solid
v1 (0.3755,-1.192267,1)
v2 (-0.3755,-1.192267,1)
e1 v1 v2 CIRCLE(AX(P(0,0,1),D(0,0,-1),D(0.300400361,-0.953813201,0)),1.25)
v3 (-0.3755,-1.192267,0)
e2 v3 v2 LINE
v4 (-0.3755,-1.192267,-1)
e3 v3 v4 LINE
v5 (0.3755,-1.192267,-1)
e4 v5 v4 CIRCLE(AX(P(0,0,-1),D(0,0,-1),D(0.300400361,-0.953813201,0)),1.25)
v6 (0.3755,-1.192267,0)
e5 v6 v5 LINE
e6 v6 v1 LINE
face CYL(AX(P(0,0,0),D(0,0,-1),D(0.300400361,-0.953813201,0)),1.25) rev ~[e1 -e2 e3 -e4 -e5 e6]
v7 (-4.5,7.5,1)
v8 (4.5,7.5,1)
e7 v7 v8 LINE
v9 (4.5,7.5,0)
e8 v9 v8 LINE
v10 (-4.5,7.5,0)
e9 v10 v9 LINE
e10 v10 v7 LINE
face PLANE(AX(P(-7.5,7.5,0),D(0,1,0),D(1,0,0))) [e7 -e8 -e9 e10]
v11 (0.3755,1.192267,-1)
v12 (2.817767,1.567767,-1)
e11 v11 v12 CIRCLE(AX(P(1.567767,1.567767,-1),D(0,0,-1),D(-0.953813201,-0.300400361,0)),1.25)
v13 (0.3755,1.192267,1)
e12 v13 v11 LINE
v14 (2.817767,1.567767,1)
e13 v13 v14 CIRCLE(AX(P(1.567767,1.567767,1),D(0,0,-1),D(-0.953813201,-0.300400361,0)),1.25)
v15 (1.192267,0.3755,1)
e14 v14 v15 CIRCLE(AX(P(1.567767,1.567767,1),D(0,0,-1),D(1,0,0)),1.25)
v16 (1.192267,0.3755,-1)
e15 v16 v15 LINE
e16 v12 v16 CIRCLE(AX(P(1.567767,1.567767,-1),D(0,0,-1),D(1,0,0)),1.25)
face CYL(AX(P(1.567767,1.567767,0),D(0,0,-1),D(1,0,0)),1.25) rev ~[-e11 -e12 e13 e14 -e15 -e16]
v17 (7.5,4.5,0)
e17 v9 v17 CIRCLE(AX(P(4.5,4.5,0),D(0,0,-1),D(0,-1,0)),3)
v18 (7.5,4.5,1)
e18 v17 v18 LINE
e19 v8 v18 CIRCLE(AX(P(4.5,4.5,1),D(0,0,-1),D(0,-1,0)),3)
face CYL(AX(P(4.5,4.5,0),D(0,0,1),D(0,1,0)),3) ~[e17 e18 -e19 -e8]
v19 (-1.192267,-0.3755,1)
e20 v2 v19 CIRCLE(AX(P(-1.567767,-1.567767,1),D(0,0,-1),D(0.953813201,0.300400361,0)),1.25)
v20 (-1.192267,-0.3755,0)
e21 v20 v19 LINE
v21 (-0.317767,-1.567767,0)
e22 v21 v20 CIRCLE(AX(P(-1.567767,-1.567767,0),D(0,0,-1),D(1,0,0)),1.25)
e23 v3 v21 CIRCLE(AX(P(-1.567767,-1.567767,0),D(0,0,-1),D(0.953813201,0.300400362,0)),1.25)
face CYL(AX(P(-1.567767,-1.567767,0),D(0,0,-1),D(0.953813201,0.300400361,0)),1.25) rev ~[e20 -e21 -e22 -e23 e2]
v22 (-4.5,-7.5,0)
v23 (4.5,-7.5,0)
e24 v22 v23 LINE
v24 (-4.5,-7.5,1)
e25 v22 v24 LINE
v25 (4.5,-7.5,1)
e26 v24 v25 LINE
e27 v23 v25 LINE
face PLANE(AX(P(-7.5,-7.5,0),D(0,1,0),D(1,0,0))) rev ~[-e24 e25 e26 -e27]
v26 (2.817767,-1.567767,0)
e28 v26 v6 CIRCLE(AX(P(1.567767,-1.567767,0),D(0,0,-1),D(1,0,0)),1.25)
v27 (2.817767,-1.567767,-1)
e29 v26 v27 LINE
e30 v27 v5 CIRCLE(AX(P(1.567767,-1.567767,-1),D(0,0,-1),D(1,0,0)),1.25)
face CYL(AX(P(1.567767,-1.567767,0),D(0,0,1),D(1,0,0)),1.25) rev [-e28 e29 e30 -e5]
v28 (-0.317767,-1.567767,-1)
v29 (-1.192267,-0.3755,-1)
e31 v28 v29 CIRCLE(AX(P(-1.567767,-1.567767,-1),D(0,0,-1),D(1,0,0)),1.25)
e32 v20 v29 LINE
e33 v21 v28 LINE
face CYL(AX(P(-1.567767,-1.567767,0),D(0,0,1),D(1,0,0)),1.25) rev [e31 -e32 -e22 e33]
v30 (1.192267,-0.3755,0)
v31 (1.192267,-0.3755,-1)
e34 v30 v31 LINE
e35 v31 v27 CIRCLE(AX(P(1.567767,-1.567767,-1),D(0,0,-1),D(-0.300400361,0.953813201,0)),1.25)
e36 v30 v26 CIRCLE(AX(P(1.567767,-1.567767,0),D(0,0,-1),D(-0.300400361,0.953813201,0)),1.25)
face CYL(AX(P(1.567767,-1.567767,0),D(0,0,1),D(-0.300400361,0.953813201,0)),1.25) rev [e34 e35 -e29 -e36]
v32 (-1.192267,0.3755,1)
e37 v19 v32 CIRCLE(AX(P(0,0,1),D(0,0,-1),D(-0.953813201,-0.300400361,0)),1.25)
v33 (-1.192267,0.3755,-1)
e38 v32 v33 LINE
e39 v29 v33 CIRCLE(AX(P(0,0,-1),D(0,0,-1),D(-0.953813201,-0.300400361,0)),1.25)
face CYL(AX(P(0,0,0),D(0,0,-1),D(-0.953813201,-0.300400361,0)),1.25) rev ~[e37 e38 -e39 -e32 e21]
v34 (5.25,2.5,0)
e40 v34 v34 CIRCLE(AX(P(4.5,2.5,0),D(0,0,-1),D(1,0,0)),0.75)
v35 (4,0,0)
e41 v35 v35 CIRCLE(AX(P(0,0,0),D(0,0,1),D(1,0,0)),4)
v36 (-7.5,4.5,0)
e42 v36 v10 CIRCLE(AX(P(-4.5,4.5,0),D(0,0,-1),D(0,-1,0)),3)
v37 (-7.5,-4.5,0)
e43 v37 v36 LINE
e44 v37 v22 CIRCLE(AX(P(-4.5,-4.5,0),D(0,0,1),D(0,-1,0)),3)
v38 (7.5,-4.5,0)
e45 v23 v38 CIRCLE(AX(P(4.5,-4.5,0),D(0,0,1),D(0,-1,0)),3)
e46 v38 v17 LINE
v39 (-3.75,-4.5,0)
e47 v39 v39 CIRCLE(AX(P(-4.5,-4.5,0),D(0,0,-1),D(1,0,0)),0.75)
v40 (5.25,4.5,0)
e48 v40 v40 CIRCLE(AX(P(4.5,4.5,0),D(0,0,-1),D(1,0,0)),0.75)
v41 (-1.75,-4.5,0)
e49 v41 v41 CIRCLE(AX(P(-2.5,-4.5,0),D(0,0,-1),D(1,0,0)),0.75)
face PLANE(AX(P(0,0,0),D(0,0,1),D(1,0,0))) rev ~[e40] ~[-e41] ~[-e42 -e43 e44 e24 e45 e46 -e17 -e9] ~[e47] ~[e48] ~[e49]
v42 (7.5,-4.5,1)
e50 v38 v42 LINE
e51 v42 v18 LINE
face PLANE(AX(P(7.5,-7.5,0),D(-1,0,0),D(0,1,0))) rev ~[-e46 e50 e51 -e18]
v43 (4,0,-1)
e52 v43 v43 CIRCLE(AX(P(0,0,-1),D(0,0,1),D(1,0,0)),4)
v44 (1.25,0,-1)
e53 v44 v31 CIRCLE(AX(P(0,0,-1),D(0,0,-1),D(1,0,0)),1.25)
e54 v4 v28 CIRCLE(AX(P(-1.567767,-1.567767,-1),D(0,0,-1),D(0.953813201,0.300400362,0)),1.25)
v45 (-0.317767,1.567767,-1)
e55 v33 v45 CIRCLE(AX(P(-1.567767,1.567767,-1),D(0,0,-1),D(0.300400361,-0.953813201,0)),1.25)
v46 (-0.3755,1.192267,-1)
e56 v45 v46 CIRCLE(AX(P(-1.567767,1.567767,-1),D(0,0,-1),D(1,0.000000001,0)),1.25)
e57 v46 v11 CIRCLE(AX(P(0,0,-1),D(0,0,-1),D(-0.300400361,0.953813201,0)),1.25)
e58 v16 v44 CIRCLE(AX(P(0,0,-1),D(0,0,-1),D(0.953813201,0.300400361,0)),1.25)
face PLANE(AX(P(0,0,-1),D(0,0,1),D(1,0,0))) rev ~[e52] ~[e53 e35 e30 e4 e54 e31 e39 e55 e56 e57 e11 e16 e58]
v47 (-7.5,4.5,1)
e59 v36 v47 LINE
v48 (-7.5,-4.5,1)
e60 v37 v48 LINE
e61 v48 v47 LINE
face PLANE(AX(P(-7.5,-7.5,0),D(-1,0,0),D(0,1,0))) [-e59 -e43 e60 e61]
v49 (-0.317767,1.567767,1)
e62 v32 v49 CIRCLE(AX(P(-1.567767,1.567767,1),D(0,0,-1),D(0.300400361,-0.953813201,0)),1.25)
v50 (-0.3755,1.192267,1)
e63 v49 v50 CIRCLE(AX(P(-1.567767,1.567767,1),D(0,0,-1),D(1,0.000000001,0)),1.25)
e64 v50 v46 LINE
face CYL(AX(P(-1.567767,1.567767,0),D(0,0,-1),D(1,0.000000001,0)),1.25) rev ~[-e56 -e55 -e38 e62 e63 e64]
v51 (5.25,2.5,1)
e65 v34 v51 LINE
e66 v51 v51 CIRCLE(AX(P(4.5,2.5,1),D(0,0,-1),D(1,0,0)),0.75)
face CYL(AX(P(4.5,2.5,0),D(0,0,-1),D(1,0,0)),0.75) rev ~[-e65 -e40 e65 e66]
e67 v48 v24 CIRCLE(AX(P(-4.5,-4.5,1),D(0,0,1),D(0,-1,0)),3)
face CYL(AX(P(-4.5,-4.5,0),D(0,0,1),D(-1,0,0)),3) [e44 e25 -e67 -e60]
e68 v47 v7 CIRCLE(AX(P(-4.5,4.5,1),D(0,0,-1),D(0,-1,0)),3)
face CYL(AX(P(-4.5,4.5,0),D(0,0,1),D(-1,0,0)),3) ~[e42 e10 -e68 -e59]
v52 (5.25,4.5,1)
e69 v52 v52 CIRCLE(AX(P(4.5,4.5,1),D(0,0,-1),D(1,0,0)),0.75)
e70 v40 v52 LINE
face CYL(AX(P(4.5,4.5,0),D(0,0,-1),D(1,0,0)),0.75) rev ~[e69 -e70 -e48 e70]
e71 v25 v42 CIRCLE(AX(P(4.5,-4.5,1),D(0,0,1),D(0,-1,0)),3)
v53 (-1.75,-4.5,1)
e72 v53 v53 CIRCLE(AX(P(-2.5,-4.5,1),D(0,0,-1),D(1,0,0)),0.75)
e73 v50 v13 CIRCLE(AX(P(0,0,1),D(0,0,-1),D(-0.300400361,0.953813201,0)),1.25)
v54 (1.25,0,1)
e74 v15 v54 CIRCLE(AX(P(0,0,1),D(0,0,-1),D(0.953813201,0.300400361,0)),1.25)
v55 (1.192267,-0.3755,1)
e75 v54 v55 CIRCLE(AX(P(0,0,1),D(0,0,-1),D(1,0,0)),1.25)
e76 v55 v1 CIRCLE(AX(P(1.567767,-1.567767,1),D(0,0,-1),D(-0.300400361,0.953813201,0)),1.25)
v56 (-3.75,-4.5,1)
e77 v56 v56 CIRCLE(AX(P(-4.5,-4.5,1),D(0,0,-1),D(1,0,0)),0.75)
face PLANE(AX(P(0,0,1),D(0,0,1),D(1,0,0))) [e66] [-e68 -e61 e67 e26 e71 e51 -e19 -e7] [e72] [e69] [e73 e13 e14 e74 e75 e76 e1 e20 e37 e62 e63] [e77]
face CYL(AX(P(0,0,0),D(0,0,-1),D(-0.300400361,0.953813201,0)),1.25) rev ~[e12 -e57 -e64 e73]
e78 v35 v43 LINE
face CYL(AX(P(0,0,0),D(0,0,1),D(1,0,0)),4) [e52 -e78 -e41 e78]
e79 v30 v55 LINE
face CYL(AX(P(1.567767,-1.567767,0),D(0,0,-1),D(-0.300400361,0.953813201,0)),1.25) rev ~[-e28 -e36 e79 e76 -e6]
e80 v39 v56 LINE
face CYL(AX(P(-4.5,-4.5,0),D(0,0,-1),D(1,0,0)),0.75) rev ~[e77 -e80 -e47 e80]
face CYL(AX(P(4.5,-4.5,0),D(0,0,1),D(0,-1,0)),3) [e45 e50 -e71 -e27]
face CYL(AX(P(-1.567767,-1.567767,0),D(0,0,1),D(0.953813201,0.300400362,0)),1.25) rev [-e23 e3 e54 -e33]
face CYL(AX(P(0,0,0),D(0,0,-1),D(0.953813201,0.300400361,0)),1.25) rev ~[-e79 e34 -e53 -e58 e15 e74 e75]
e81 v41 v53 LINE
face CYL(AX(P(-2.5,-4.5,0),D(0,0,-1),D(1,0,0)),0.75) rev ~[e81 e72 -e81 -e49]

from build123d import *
from build123d import SkipClean  # not in build123d's __all__

# Parameters (mm, degrees)
F0_R     = 4
F1_DEPTH = 1
F2_W     = 15
F2_H     = 15
F2_R     = 5
F2_R_2   = 4
F3_DEPTH = 1
F4_R     = 3
F5_R     = 0.75
F6_DEPTH = 25


# Not quite as in the source:
# - after a boolean that leaves OpenCascade's solid faulty, fix() repairs it


with BuildPart() as f1:
    # F0 (on Top) → F1 (new body)
    with BuildSketch(Plane.XY):
        Circle(F0_R)
        with BuildLine():
            ThreePointArc((1.1922665017, 0.3755004513), (1.2354823202, 0.1899564067), (1.25, 0))
            ThreePointArc((1.25, 0), (1.2354823202, -0.1899564067), (1.1922665017, -0.3755004513))
            ThreePointArc((1.1922665017, -0.3755004513), (2.3070654164, -0.559829563), (2.817766953, -1.567766953))
            ThreePointArc((2.817766953, -1.567766953), (1.3778105463, -2.8032492732), (0.3755004513, -1.1922665017))
            ThreePointArc((0.3755004513, -1.1922665017), (0, -1.25), (-0.3755004513, -1.1922665017))
            ThreePointArc((-0.3755004513, -1.1922665017), (-0.3322846327, -1.3778105463), (-0.317766953, -1.567766953))
            ThreePointArc((-0.317766953, -1.567766953), (-2.5757043429, -2.3070654164), (-1.1922665017, -0.3755004513))
            ThreePointArc((-1.1922665017, -0.3755004513), (-1.25, 0), (-1.1922665017, 0.3755004513))
            ThreePointArc((-1.1922665017, 0.3755004513), (-2.5757043429, 2.3070654164), (-0.317766953, 1.567766953))
            ThreePointArc((-0.317766953, 1.567766953), (-0.3322846327, 1.3778105463), (-0.3755004513, 1.1922665017))
            ThreePointArc((-0.3755004513, 1.1922665017), (0, 1.25), (0.3755004513, 1.1922665017))
            ThreePointArc((0.3755004513, 1.1922665017), (1.3778105463, 2.8032492732), (2.817766953, 1.567766953))
            ThreePointArc((2.817766953, 1.567766953), (2.3070654164, 0.559829563), (1.1922665017, 0.3755004513))
        make_face(mode=Mode.SUBTRACT)
    extrude(amount=-F1_DEPTH)

    # F2 (on face) → F3 (join)
    with BuildSketch(Plane.XY):
        Rectangle(F2_W, F2_H)
        Circle(F2_R, mode=Mode.SUBTRACT)
        Circle(F2_R)
        Circle(F2_R_2, mode=Mode.SUBTRACT)
        Circle(F2_R_2)
        with BuildLine():
            ThreePointArc((1.1922665017, 0.3755004513), (1.2354823202, 0.1899564067), (1.25, 0))
            ThreePointArc((1.25, 0), (1.2354823202, -0.1899564067), (1.1922665017, -0.3755004513))
            ThreePointArc((1.1922665017, -0.3755004513), (2.4516504294, -2.4516504294), (0.3755004513, -1.1922665017))
            ThreePointArc((0.3755004513, -1.1922665017), (0, -1.25), (-0.3755004513, -1.1922665017))
            ThreePointArc((-0.3755004513, -1.1922665017), (-2.4516504294, -2.4516504294), (-1.1922665017, -0.3755004513))
            ThreePointArc((-1.1922665017, -0.3755004513), (-1.25, 0), (-1.1922665017, 0.3755004513))
            ThreePointArc((-1.1922665017, 0.3755004513), (-2.5757043429, 2.3070654164), (-0.317766953, 1.567766953))
            ThreePointArc((-0.317766953, 1.567766953), (-0.3322846327, 1.3778105463), (-0.3755004513, 1.1922665017))
            ThreePointArc((-0.3755004513, 1.1922665017), (0, 1.25), (0.3755004513, 1.1922665017))
            ThreePointArc((0.3755004513, 1.1922665017), (1.3778105463, 2.8032492732), (2.817766953, 1.567766953))
            ThreePointArc((2.817766953, 1.567766953), (2.3070654164, 0.559829563), (1.1922665017, 0.3755004513))
        make_face(mode=Mode.SUBTRACT)
    with SkipClean():  # cleaning this boolean's faces spoils the solid; the shape is the same uncleaned
        extrude(amount=F3_DEPTH)

    # F4
    f4_edges = [f1.edges().sort_by_distance(p)[0] for p in [
        (-7.5, -7.5, 0.5),
        (7.5, -7.5, 0.5),
        (-7.5, 7.5, 0.5),
        (7.5, 7.5, 0.5),
    ]]
    fillet(f4_edges, radius=F4_R)

    # F5 (on face) → F6 (cut)
    with BuildSketch(Plane(origin=(0, 0, 0), x_dir=(1, 0, 0), z_dir=(0, 0, -1))):
        with Locations((-4.5, 4.5)):
            Circle(F5_R)
        with Locations((-2.5, 4.5)):
            Circle(F5_R)
        with Locations((4.5, -4.5)):
            Circle(F5_R)
        with Locations((4.5, -2.5)):
            Circle(F5_R)
    extrude(amount=-F6_DEPTH, mode=Mode.SUBTRACT)

    add(f1.part.fix(), mode=Mode.REPLACE)


solid = f1.part
